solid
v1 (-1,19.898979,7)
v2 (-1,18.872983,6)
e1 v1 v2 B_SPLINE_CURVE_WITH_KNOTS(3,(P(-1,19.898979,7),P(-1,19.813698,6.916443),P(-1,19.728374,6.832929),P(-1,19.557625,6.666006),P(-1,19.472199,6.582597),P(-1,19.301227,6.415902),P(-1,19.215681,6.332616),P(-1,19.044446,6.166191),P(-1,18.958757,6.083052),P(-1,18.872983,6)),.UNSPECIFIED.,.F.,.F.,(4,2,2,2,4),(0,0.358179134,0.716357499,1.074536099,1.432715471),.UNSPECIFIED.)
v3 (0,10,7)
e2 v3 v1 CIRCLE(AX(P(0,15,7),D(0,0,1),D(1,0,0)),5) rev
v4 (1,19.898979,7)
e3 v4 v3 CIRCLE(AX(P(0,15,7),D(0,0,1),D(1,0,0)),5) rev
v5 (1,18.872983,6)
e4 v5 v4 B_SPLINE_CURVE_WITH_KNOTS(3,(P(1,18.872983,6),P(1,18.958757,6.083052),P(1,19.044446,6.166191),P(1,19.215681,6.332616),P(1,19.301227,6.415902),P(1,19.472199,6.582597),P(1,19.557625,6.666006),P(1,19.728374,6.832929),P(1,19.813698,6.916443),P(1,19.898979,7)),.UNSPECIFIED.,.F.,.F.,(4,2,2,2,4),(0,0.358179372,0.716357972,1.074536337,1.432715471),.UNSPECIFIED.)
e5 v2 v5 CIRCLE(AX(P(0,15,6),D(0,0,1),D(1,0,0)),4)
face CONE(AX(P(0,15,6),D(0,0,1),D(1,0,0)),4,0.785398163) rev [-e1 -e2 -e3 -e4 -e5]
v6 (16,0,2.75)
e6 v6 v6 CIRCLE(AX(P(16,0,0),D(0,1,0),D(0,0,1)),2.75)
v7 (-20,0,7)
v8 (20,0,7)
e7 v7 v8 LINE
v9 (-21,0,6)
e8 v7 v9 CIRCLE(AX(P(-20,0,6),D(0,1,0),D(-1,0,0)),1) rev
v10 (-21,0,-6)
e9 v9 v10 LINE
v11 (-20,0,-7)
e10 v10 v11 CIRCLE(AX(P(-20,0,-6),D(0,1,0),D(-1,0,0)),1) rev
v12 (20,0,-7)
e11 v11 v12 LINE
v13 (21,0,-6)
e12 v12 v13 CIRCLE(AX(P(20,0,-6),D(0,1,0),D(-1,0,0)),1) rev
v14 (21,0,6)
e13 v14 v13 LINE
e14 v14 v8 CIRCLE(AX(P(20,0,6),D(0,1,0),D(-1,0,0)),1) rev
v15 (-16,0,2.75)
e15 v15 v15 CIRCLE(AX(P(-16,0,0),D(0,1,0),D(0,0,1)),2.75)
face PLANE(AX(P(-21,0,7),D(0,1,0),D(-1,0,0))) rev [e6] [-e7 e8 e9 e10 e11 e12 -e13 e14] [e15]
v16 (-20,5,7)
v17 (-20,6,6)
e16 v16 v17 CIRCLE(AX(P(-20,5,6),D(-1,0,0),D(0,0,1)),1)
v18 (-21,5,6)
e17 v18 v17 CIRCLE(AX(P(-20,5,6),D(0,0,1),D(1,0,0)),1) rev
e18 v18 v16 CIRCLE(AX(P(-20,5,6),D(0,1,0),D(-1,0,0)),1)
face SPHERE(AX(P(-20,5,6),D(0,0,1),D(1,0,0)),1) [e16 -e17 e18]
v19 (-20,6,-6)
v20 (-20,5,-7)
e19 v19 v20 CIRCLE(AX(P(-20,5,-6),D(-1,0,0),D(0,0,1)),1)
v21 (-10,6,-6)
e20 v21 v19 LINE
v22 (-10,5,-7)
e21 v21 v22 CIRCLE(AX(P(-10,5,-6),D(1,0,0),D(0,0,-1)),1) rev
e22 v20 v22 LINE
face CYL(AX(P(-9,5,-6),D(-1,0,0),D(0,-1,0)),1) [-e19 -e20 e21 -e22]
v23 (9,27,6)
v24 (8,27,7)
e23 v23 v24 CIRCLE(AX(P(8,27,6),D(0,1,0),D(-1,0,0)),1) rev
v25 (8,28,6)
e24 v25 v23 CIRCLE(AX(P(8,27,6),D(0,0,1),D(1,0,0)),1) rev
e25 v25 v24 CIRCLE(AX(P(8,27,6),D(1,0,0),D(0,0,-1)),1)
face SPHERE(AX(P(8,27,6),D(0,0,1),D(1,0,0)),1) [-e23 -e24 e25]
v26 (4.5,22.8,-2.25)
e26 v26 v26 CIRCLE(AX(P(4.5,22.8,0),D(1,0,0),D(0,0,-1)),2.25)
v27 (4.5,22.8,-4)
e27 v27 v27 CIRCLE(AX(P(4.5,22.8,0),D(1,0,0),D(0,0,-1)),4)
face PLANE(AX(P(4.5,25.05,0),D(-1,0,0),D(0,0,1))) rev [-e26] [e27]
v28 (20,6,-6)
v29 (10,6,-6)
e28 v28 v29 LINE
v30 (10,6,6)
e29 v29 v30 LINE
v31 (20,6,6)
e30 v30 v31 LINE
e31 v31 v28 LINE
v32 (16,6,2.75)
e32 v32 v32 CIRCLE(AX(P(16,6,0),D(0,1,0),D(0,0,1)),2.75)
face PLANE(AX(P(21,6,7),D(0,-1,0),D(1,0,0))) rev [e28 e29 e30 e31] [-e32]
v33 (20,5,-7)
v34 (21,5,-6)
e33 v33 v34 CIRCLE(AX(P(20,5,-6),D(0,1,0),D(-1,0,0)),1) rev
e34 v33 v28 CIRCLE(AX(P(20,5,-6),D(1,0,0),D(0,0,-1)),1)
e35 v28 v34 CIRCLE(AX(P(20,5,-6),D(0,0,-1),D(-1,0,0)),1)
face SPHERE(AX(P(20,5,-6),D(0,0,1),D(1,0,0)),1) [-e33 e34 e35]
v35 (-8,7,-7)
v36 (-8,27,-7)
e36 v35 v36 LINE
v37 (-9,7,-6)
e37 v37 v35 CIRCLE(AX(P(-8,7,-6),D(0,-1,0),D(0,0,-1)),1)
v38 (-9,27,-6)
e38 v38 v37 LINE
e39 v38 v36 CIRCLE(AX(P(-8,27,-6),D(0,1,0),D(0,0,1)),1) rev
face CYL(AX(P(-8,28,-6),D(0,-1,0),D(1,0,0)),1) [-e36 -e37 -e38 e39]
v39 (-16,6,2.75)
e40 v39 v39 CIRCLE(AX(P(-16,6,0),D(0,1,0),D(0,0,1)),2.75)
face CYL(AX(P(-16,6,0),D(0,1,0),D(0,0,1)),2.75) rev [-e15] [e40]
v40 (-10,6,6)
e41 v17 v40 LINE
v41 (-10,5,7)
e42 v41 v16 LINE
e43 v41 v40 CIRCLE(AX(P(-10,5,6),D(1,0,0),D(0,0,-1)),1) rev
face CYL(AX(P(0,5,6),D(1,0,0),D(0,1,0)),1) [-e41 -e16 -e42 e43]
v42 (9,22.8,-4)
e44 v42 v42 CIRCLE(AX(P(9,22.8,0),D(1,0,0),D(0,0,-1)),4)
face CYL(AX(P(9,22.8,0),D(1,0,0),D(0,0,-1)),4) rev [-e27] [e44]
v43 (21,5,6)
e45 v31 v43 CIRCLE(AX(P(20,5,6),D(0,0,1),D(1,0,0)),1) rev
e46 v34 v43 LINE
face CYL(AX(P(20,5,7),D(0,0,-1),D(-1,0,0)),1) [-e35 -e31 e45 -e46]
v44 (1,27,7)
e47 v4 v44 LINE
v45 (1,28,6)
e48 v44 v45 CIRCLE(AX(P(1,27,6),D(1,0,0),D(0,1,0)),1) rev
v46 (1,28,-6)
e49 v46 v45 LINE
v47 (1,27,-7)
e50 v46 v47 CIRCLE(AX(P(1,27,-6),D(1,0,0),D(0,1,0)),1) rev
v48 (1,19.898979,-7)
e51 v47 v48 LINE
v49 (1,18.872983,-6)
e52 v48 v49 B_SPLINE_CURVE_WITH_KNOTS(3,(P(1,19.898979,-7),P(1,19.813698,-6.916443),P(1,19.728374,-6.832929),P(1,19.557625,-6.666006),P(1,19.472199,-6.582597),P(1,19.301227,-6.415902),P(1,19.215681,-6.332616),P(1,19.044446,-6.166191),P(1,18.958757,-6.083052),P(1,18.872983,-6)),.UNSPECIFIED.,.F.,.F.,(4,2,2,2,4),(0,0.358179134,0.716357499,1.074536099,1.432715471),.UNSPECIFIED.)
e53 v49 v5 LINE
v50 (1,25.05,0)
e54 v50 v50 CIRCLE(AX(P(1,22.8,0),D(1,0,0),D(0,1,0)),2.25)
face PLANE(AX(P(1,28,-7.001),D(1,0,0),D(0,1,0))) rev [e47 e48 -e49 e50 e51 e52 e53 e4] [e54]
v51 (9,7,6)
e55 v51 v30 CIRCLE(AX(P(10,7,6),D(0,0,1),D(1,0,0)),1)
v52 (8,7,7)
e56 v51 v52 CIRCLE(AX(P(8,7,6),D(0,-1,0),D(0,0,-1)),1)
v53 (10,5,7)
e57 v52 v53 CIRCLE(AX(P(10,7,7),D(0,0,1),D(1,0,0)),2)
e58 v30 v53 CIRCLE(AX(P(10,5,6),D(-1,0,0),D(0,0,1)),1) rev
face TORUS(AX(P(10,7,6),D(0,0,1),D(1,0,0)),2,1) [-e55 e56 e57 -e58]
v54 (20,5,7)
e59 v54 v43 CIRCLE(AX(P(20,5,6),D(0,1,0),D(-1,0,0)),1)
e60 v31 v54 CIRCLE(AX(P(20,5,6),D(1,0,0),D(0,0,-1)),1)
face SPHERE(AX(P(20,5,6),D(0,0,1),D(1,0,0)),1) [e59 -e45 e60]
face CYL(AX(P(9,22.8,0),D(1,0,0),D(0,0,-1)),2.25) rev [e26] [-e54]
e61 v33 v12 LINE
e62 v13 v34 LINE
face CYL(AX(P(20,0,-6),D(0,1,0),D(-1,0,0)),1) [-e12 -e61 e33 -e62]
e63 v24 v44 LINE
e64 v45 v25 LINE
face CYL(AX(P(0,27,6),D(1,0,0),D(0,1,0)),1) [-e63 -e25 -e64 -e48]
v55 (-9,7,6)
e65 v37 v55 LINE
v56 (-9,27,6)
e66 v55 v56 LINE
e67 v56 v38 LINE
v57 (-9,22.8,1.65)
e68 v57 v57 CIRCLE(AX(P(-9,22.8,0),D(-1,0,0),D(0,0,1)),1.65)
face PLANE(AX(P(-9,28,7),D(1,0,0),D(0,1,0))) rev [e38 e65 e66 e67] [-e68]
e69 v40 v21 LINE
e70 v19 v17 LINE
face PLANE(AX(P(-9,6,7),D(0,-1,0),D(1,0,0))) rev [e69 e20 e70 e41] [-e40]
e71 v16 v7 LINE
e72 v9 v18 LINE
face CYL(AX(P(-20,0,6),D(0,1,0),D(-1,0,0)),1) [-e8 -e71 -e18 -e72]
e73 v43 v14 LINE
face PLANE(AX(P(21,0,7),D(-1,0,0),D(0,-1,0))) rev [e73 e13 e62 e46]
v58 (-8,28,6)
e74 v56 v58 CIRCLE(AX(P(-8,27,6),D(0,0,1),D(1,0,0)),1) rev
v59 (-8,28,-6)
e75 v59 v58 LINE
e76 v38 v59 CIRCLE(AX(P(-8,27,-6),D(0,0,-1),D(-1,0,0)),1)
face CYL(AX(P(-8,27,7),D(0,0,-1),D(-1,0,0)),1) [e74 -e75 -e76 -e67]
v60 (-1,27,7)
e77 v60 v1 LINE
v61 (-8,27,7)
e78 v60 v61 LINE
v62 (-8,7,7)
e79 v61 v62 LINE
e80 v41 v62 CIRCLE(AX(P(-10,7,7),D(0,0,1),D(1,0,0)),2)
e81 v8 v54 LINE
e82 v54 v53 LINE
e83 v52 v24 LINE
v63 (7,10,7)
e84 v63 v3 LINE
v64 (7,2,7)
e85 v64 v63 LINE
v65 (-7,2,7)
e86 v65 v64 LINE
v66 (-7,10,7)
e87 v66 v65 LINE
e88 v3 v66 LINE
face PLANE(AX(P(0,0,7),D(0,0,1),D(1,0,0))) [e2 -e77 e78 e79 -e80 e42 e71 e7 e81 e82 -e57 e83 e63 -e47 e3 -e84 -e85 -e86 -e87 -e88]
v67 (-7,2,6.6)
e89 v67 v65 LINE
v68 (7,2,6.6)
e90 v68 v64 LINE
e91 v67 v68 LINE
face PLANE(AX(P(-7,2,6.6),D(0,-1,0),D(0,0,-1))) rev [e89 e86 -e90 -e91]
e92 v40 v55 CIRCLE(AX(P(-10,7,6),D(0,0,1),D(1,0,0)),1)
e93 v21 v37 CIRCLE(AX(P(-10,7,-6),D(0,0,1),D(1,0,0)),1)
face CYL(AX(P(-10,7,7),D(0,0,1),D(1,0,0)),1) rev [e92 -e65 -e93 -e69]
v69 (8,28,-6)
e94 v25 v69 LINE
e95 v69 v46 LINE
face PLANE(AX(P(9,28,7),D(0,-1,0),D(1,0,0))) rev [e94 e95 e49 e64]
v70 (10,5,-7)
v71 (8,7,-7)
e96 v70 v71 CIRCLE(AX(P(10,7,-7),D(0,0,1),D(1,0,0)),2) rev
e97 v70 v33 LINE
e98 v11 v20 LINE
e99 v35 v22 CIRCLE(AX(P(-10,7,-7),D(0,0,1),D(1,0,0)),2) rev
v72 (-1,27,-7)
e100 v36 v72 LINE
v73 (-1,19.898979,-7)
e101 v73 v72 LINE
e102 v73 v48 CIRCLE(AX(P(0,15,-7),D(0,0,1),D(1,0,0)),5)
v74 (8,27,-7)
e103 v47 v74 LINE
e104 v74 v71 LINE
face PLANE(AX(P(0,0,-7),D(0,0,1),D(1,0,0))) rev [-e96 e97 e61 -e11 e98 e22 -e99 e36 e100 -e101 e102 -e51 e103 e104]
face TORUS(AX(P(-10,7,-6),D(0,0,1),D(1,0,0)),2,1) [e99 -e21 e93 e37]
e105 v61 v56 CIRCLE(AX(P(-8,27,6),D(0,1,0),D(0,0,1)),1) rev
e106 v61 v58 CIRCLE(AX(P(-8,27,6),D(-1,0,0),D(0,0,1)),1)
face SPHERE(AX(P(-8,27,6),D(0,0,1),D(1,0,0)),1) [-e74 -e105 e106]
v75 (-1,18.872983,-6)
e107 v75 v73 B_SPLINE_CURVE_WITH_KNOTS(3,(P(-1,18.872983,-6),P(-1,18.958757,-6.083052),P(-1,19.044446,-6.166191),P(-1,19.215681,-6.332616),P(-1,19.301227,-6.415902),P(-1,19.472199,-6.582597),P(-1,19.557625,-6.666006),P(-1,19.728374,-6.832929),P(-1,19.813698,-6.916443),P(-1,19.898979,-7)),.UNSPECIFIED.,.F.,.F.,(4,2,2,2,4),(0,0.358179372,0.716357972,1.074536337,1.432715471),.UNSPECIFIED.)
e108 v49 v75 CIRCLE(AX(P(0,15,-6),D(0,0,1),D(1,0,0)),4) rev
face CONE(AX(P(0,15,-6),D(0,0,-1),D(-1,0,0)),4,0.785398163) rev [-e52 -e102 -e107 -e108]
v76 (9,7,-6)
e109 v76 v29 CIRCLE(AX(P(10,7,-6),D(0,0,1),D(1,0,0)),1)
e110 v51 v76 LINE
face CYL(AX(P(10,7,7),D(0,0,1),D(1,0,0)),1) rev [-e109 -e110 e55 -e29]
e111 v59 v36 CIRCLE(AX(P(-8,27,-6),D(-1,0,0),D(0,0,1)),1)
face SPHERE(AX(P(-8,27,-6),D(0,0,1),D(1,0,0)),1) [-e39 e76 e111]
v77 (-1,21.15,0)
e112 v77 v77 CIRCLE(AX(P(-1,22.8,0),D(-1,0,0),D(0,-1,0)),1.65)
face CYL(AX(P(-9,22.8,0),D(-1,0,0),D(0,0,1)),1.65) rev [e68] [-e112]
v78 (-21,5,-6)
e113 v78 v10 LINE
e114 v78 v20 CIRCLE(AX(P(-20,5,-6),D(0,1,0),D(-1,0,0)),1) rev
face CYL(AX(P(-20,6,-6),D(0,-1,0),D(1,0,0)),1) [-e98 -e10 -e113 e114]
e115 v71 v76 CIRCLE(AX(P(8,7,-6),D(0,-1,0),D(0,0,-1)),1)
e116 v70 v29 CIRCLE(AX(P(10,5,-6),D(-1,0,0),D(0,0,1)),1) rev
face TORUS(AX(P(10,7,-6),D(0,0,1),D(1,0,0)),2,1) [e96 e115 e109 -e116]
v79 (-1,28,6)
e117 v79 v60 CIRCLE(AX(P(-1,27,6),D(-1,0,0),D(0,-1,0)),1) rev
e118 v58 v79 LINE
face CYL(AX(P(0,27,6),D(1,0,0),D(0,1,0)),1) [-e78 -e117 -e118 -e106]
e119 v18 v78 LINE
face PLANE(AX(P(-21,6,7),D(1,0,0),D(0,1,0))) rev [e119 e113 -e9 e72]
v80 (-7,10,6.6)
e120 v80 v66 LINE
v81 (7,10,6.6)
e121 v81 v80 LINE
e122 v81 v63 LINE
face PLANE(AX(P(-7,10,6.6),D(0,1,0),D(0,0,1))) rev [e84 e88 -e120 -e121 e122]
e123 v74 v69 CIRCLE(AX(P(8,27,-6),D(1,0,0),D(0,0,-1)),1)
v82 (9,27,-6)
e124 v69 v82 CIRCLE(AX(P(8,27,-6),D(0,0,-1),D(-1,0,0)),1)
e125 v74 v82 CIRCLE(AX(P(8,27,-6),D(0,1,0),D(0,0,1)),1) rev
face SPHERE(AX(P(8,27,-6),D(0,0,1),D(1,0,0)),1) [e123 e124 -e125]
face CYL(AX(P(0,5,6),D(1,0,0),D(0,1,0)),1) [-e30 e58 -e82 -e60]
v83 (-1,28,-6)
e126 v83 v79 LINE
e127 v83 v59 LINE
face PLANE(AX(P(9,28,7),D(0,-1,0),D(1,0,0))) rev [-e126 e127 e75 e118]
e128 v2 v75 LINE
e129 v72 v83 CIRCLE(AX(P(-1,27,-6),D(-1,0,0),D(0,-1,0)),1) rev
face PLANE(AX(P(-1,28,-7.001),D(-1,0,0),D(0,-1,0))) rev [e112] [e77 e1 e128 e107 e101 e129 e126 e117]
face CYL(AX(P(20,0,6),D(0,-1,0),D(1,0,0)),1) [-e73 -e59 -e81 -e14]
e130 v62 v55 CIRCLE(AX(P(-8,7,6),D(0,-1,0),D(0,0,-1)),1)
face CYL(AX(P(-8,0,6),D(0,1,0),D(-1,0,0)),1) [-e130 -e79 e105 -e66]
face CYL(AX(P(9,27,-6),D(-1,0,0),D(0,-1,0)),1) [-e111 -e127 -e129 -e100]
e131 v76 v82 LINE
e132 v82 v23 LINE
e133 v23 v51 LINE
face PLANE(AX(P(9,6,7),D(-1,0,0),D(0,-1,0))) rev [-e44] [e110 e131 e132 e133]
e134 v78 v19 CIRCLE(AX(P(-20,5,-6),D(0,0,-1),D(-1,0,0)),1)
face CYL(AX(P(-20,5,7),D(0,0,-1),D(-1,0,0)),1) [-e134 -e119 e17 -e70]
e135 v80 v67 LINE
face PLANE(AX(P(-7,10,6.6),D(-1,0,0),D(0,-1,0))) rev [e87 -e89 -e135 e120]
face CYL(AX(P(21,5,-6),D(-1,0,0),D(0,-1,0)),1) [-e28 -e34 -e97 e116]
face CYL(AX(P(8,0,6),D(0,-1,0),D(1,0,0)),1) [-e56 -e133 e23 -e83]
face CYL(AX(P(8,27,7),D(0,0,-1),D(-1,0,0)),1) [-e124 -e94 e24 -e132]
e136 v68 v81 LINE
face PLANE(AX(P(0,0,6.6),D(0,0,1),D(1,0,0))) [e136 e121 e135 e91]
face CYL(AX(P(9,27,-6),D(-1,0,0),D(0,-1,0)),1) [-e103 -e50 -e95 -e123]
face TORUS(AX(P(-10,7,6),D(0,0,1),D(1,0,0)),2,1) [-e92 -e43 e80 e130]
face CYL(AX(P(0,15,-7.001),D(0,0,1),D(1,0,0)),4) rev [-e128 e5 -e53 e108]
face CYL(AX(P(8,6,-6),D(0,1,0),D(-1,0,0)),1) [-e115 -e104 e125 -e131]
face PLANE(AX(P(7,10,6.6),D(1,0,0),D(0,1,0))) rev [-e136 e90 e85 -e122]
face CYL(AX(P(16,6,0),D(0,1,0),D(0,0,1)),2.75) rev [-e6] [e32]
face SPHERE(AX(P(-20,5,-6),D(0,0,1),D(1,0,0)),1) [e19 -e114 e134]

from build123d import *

# Parameters (mm, degrees)
BOSS_EXTRUDE1_DEPTH                        = 7
CUT_EXTRUDE1_REACH                         = 39.696
SKETCH2_R                                  = 4
DIAMETER_HOLE1_D                           = 5.5
CBORE_START                                = 4.5
CBORE_FOR_SOCKET_HEAD_CAP_SCREW1_OUTLINE_R = 4
CBORE_FOR_SOCKET_HEAD_CAP_SCREW1_DEPTH     = 4.5
CBORE_FOR_SOCKET_HEAD_CAP_SCREW1_2_OUTLI_R = 2.25
CBORE_FOR_SOCKET_HEAD_CAP_SCREW1_2_DEPTH   = 4.5
TAPPED_HOLE1_D                             = 3.3
CUT_EXTRUDE2_REACH                         = 39.696
SKETCH9_W                                  = 2
SKETCH9_H                                  = 13
SKETCH10_W                                 = 14
SKETCH10_H                                 = 8
CUT_EXTRUDE3_DEPTH                         = 0.4
FILLET1_R                                  = 1
CHAMFER1_SIZE                              = 1


# Read off the part's stored shape, not the designer's step: CBORE for Socket Head Cap Screw1
with BuildPart() as part:
    # Sketch1 → Boss-Extrude1 (new, symmetric)
    with BuildSketch(Plane.XY):
        Polygon((-21, 0), (21, 0), (21, 6), (9, 6), (9, 28), (-9, 28), (-9, 6), (-21, 6), align=None)
    extrude(amount=BOSS_EXTRUDE1_DEPTH, both=True)

    # Sketch2 → Cut-Extrude1 (cut, up to next)
    with BuildSketch(Plane.XY.offset(7), mode=Mode.PRIVATE) as cut_extrude1_sk1:
        with Locations((0, 15)):
            Circle(SKETCH2_R)
    cut_extrude1_tool1 = extrude(cut_extrude1_sk1.sketch, amount=-CUT_EXTRUDE1_REACH, mode=Mode.PRIVATE) & part.part
    add(cut_extrude1_tool1.solids().sort_by_distance((0, 15, 7))[0], mode=Mode.SUBTRACT)

    # Diameter Hole1 (through all)
    with Locations(Plane(origin=(0, 6, 0), x_dir=(1, 0, 0), z_dir=(0, 1, 0))):
        with Locations((-16, 0), (16, 0)):
            Hole(DIAMETER_HOLE1_D / 2)

    # CBORE for Socket Head Cap Screw1 outline → CBORE for Socket Head Cap Screw1 (cut)
    with BuildSketch(Plane.YZ.offset(CBORE_START)):
        with Locations((22.8, 0)):
            Circle(CBORE_FOR_SOCKET_HEAD_CAP_SCREW1_OUTLINE_R)
    extrude(amount=CBORE_FOR_SOCKET_HEAD_CAP_SCREW1_DEPTH, mode=Mode.SUBTRACT)

    # CBORE for Socket Head Cap Screw1 2 outli → CBORE for Socket Head Cap Screw1 2 (cut)
    with BuildSketch(Plane.YZ):
        with Locations((22.8, 0)):
            Circle(CBORE_FOR_SOCKET_HEAD_CAP_SCREW1_2_OUTLI_R)
    extrude(amount=CBORE_FOR_SOCKET_HEAD_CAP_SCREW1_2_DEPTH, mode=Mode.SUBTRACT)

    # Tapped Hole1 (through all)
    with Locations(Plane(origin=(-9, -2.558166827, -1.433608379), x_dir=(0, 0, -1), z_dir=(-1, 0, 0))):
        with Locations((-1.433608379, -25.358166827)):
            Hole(TAPPED_HOLE1_D / 2)

    # Sketch9 → Cut-Extrude2 (cut, up to next)
    with BuildSketch(Plane.XY.offset(7), mode=Mode.PRIVATE) as cut_extrude2_sk1:
        with Locations((0, 21.5)):
            Rectangle(SKETCH9_W, SKETCH9_H)
    cut_extrude2_tool1 = extrude(cut_extrude2_sk1.sketch, amount=-CUT_EXTRUDE2_REACH, mode=Mode.PRIVATE) & part.part
    add(cut_extrude2_tool1.solids().sort_by_distance((0, 21.5, 7))[0], mode=Mode.SUBTRACT)

    # Sketch10 → Cut-Extrude3 (cut)
    with BuildSketch(Plane.XY.offset(7)):
        with Locations((0, 6)):
            Rectangle(SKETCH10_W, SKETCH10_H)
    extrude(amount=-CUT_EXTRUDE3_DEPTH, mode=Mode.SUBTRACT)

    # Fillet1
    fillet1_edges = [part.edges().sort_by_distance(p)[0] for p in [
        (21, 3, 7),
        (-21, 3, -7),
        (15, 6, 7),
        (-21, 6, 0),
        (-9, 6, 0),
        (-9, 28, 0),
        (9, 28, 0),
        (9, 6, 0),
        (21, 6, 0),
        (9, 17, 7),
        (5, 28, 7),
        (-9, 17, 7),
        (-15, 6, 7),
        (-21, 3, 7),
        (-5, 28, -7),
        (-5, 28, 7),
        (-15, 6, -7),
        (-9, 17, -7),
        (5, 28, -7),
        (9, 17, -7),
        (15, 6, -7),
        (21, 3, -7),
    ]]
    fillet(fillet1_edges, radius=FILLET1_R)

    # Chamfer1
    chamfer1_edges = [part.edges().sort_by_distance(p)[0] for p in [
        (0, 11, 7),
        (0, 11, -7),
    ]]
    chamfer(chamfer1_edges, length=CHAMFER1_SIZE - 0.0001)  # a hair under: the kernel refuses the full size


solid = part.part
